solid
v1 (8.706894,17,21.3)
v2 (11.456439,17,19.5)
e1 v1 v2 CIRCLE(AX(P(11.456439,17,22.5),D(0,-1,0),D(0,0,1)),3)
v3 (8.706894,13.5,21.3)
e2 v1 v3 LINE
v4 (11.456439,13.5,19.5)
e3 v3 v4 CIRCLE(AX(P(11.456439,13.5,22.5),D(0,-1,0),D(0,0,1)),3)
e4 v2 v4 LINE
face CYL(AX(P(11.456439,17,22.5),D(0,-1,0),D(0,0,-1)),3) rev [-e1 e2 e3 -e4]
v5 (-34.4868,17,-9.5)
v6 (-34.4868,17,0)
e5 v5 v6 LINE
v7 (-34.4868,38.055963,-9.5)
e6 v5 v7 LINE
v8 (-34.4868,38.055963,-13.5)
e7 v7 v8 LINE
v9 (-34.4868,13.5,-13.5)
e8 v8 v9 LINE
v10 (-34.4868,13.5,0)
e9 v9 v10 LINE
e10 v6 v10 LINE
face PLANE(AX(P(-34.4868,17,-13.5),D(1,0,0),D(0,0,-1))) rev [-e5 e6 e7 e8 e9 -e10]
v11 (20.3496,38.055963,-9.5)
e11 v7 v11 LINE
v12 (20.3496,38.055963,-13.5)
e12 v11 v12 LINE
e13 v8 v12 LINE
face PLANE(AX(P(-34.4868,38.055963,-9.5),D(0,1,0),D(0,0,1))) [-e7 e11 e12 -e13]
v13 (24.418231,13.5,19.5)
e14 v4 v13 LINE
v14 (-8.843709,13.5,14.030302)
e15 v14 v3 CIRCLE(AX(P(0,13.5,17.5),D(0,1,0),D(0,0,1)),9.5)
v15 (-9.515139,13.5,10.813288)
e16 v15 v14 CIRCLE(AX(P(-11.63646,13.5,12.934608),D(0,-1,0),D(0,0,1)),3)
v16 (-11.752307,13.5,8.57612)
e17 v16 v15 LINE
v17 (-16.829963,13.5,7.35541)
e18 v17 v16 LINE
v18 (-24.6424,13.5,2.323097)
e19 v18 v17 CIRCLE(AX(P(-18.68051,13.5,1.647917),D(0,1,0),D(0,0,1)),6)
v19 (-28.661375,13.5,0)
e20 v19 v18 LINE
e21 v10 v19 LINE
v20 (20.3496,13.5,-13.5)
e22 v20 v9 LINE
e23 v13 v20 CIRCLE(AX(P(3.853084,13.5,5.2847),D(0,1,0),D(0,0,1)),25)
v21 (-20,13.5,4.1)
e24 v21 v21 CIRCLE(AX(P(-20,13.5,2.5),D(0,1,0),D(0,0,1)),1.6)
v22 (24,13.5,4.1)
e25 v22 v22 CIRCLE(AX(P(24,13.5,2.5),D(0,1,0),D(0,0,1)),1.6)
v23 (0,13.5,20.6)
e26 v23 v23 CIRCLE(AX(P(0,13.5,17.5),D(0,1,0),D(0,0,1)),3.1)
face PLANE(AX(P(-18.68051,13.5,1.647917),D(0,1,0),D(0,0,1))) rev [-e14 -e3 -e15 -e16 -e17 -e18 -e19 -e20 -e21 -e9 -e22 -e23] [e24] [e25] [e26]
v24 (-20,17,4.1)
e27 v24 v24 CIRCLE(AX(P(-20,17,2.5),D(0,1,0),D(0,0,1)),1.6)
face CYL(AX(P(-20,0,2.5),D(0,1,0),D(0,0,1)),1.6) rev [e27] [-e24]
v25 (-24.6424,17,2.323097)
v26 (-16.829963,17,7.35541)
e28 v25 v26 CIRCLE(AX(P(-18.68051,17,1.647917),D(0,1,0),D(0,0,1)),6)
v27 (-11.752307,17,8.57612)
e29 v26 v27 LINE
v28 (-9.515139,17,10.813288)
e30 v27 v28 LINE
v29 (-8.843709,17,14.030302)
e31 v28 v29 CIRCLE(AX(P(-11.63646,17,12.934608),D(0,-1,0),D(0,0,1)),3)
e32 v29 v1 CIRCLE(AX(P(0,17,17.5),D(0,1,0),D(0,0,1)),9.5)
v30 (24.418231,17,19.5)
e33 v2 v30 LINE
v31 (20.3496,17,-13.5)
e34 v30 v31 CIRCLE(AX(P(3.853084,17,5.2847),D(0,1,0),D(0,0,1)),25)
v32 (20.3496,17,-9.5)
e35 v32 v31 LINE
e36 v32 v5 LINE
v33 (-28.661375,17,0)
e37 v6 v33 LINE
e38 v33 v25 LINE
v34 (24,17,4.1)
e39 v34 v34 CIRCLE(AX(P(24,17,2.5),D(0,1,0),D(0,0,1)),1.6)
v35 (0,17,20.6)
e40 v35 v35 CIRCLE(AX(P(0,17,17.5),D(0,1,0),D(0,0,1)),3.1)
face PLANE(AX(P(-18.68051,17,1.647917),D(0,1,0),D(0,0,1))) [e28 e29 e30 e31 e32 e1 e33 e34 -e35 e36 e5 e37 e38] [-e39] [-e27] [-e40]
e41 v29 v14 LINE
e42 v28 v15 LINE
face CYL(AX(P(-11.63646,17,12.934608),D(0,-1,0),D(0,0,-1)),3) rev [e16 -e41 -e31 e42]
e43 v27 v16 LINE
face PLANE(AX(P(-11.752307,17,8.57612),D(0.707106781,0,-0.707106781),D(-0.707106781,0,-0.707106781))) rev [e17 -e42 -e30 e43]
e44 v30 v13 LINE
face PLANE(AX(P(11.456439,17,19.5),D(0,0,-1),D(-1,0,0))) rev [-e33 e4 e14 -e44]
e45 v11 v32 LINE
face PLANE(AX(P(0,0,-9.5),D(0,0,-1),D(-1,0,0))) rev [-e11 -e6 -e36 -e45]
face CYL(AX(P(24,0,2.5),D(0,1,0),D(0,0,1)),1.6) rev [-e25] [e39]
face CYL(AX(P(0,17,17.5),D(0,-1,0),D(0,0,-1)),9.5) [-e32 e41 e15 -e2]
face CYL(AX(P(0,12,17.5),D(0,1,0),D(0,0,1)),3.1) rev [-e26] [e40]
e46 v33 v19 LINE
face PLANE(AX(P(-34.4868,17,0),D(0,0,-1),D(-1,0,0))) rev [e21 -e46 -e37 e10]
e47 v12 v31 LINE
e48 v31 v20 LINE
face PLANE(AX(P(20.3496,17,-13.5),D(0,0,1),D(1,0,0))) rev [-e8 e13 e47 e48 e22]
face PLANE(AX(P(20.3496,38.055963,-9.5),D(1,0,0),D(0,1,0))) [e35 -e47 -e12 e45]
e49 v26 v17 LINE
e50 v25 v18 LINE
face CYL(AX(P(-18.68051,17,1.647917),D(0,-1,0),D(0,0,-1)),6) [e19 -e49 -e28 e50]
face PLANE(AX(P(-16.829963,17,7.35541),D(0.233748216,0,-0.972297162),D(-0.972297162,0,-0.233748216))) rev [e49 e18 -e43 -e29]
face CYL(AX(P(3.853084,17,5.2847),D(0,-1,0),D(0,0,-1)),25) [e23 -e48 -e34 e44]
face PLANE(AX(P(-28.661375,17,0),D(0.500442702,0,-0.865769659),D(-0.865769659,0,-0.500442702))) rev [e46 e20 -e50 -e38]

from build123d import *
from build123d.topology import SkipClean

# Parameters (mm, degrees)
CROQUIS1_W              = 70
CROQUIS1_H              = 65
EXTRUIR1_DEPTH          = 3.5
CROQUIS2_R              = 3.1
EXTRUIR2_DEPTH          = 5
EXTRUIR3_DEPTH          = 10
CROQUIS4_OUTSIDE_W      = 91.294
CROQUIS4_OUTSIDE_H      = 86.294
EXTRUIR4_DEPTH          = 10
REDONDEO1_R             = 3
EXTRUIR5_DEPTH          = 13.5
EXTRUIR6_DEPTH          = 3.5
CROQUIS7_R              = 1.6
EXTRUIR7_DEPTH          = 47.982330447
CROQUIS8_R              = 3.1
EXTRUIR8_DEPTH          = 5
CROQUIS9_W              = 0.7
CROQUIS9_H              = 10.5
EXTRUIR9_DEPTH          = 10
EXTRUIR10_DEPTH         = 63.752948337
EXTRUIR10_DEPTH_BACK    = 10
CROQUIS10_W             = 3.0625
CROQUIS10_H             = 5
CROQUIS11_W             = 54.8364
CROQUIS11_H             = 21.05596306
SALIENTE_EXTRUIR1_DEPTH = 4


with BuildPart() as part:
    # Croquis1 → Extruir1 (new body)
    with BuildSketch(Plane(origin=(0, 0, 0), x_dir=(1, 0, 0), z_dir=(0, 1, 0))):
        Rectangle(CROQUIS1_W, CROQUIS1_H)
    extrude(amount=EXTRUIR1_DEPTH)

    # Croquis2 → Extruir2 (cut)
    with BuildSketch(Plane(origin=(0, 3.5, 0), x_dir=(1, 0, 0), z_dir=(0, 1, 0))):
        with Locations(Location((0, -17.5, 0), (0, 0, 270))):
            Circle(CROQUIS2_R)
    extrude(amount=-EXTRUIR2_DEPTH, mode=Mode.SUBTRACT)

    # Croquis3 → Extruir3 (add)
    with BuildSketch(Plane(origin=(0, 3.5, 0), x_dir=(1, 0, 0), z_dir=(0, 1, 0))):
        with BuildLine():
            Line((-34.4868, 13.5), (20.3496, 13.5))
            Line((20.3496, 13.5), (20.3496, 0))
            Line((20.3496, 0), (17.146428199, 0))
            ThreePointArc((17.146428199, 0), (22.955777517, -8.939493087), (24.418230894, -19.5))
            Line((24.418230894, -19.5), (9.287087811, -19.5))
            ThreePointArc((9.287087811, -19.5), (-3.635492607, -26.276855559), (-7.981176331, -12.347250794))
            Line((-7.981176331, -12.347250794), (-18.680510212, -1.647916913))
            ThreePointArc((-18.680510212, -1.647916913), (-17.932408832, -0.806327142), (-17.146428199, 0))
            Line((-17.146428199, 0), (-34.4868, 0))
            Line((-34.4868, 0), (-34.4868, 13.5))
        make_face()
        with BuildLine():
            Line((-32.9868, 1.5), (-12.961481397, 1.5))
            ThreePointArc((-12.961481397, 1.5), (-14.868021343, 0.048274597), (-16.613165932, -1.593940849))
            Line((-16.613165932, -1.593940849), (-5.999348286, -12.207758495))
            ThreePointArc((-5.999348286, -12.207758495), (-3.061467459, -24.89103626), (7.984359711, -18))
            Line((7.984359711, -18), (22.994564575, -18))
            ThreePointArc((22.994564575, -18), (20.451694563, -6.977253708), (12.961481397, 1.5))
            Line((12.961481397, 1.5), (18.8496, 1.5))
            Line((18.8496, 1.5), (18.8496, 12))
            Line((18.8496, 12), (-32.9868, 12))
            Line((-32.9868, 12), (-32.9868, 1.5))
        make_face(mode=Mode.SUBTRACT)
    extrude(amount=EXTRUIR3_DEPTH)

    # Croquis4 outside → Extruir4 (cut)
    with SkipClean():  # the faces are left unmerged after this step: merging them gives an invalid solid
        with BuildSketch(Plane(origin=(0, 3.5, 0), x_dir=(1, 0, 0), z_dir=(0, 1, 0))):
            Rectangle(CROQUIS4_OUTSIDE_W, CROQUIS4_OUTSIDE_H)
            with BuildLine():
                Line((-34.4868, 0), (-17.146428199, 0))
                ThreePointArc((-17.146428199, 0), (-17.932408832, -0.806327142), (-18.680510212, -1.647916913))
                Line((-18.680510212, -1.647916913), (-7.981176331, -12.347250794))
                ThreePointArc((-7.981176331, -12.347250794), (-3.635492607, -26.276855559), (9.287087811, -19.5))
                Line((9.287087811, -19.5), (24.418230894, -19.5))
                ThreePointArc((24.418230894, -19.5), (22.955777517, -8.939493087), (17.146428199, 0))
                Line((17.146428199, 0), (20.3496, 0))
                Line((20.3496, 0), (20.3496, 13.5))
                Line((20.3496, 13.5), (-34.4868, 13.5))
                Line((-34.4868, 13.5), (-34.4868, 0))
            make_face(mode=Mode.SUBTRACT)
        extrude(amount=-EXTRUIR4_DEPTH, mode=Mode.SUBTRACT)

    # Redondeo1
    redondeo1_edges = [part.edges().sort_by_distance(p)[0] for p in [
        (-7.981176331, 8.5, 12.347250794),
        (9.287087811, 8.5, 19.5),
        (-5.999348286, 8.5, 12.207758495),
        (7.984359711, 8.5, 18),
    ]]
    fillet(redondeo1_edges, radius=REDONDEO1_R)

    # Croquis5 → Extruir5 (add)
    with SkipClean():  # the faces are left unmerged after this step: merging them gives an invalid solid
        with BuildSketch(Plane.XZ):
            with BuildLine():
                Line((-18.680510212, 1.647916913), (-14.437869525, 5.8905576))
                ThreePointArc((-14.437869525, 5.8905576), (-21.723092903, 6.819250451), (-24.449770984, 0))
                Line((-24.449770984, 0), (-17.146428199, 0))
                ThreePointArc((-17.146428199, 0), (-17.932408832, 0.806327142), (-18.680510212, 1.647916913))
            make_face()
            with BuildLine():
                Line((20.3496, 0), (20.3496, -13.5))
                ThreePointArc((20.3496, -13.5), (28.665212431, 2.225567304), (24.418230894, 19.5))
                ThreePointArc((24.418230894, 19.5), (22.955777517, 8.939493087), (17.146428199, 0))
                Line((17.146428199, 0), (20.3496, 0))
            make_face()
        extrude(amount=-EXTRUIR5_DEPTH)

    # Chaflán1
    # the kernel refuses this chamfer: 5, 4.044665138 mm, written as the material it adds along each edge
    with BuildSketch(Plane(origin=(-14.437869525, 3.5, 5.8905576), x_dir=(-0.8528028654224412, 0, 0.5222329678670944), z_dir=(0, 1, 0))) as chafl_n1_piece_1:
        with BuildLine():
            Line((2.946399951, -0.141421356), (-1.029187491, 3.834166086))
            Line((-1.029187491, 3.834166086), (-1.126417207, 3.810791264))
            ThreePointArc((-1.126417207, 3.810791264), (-0.561046898, 1.905915324), (-0.097229716, -0.023374822))
            Line((-0.097229716, -0.023374822), (0.023374822, -0.097229716))
            ThreePointArc((0.023374822, -0.097229716), (1.474874577, 0.065772974), (2.923025129, -0.238651072))
            Line((2.923025129, -0.238651072), (2.946399951, -0.141421356))
        make_face()
    extrude(amount=10)
    with BuildSketch(Plane(origin=(-24.449770984, 3.5, 0), x_dir=(-0.08263556343231732, 0, 0.9965798330571533), z_dir=(0, 1, 0))) as chafl_n1_piece_2:
        with BuildLine():
            Line((2.416506842, 0.180832589), (0.262590721, -4.378032196))
            Line((0.262590721, -4.378032196), (0.162932738, -4.386295752))
            ThreePointArc((0.162932738, -4.386295752), (0.081510488, -2.193144218), (-0.099657983, -0.008263556))
            Line((-0.099657983, -0.008263556), (0.019425577, 0.098095091))
            ThreePointArc((0.019425577, 0.098095091), (1.209024094, -0.014134236), (2.397081265, 0.278927681))
            Line((2.397081265, 0.278927681), (2.416506842, 0.180832589))
        make_face()
    extrude(amount=10)
    with BuildSketch(Plane(origin=(-24.449770984, 0, 0), x_dir=(-1, 0, 0), z_dir=(0, 1, 0))) as chafl_n1_piece_3:
        with BuildLine():
            Line((4.384757927, -0.10008854), (0.019475293, 2.423185189))
            Line((0.019475293, 2.423185189), (-0.079889541, 2.411932193))
            ThreePointArc((-0.079889541, 2.411932193), (0.113994282, 1.203721039), (-0.096154346, 0.027465282))
            Line((-0.096154346, 0.027465282), (0, -0.1))
            ThreePointArc((0, -0.1), (2.192378963, -0.1), (4.384757927, -0.20008854))
            Line((4.384757927, -0.20008854), (4.384757927, -0.10008854))
        make_face()
    extrude(amount=3.5)
    with BuildSketch(Plane(origin=(-14.437869525, 0, 5.8905576), x_dir=(0.7071067811865478, 0, 0.7071067811865472), z_dir=(0, 1, 0))) as chafl_n1_piece_4:
        with BuildLine():
            Line((3.968519544, 0.104446594), (-0.826219316, -2.831719321))
            Line((-0.826219316, -2.831719321), (-0.91529167, -2.786264775))
            ThreePointArc((-0.91529167, -2.786264775), (-0.280798425, -1.449390681), (-0.1, 0))
            Line((-0.1, 0), (0, 0.1))
            ThreePointArc((0, 0.1), (1.984259772, 0.1), (3.968519544, 0.204446594))
            Line((3.968519544, 0.204446594), (3.968519544, 0.104446594))
        make_face()
    extrude(amount=3.5)


with BuildPart() as body_2:
    # Croquis6 → Extruir6 (new body)
    with BuildSketch(Plane(origin=(0, 13.5, 0), x_dir=(1, 0, 0), z_dir=(0, 1, 0))):
        with BuildLine():
            Line((-34.4868, 13.5), (-34.4868, 0))
            Line((-34.4868, 0), (-28.661374979, 0))
            Line((-28.661374979, 0), (-24.642400208, -2.323096648))
            ThreePointArc((-24.642400208, -2.323096648), (-21.929637735, -6.692039268), (-16.829963308, -7.355409896))
            Line((-16.829963308, -7.355409896), (-11.752306982, -8.576120143))
            Line((-11.752306982, -8.576120143), (-9.515139435, -10.813287689))
            ThreePointArc((-9.515139435, -10.813287689), (-8.69974084, -12.321679102), (-8.843709432, -14.030302105))
            ThreePointArc((-8.843709432, -14.030302105), (-3.635492607, -26.276855559), (8.70689382, -21.3))
            ThreePointArc((8.70689382, -21.3), (9.813271565, -19.99001992), (11.456439237, -19.5))
            Line((11.456439237, -19.5), (24.418230894, -19.5))
            ThreePointArc((24.418230894, -19.5), (28.665212431, -2.225567304), (20.3496, 13.5))
            Line((20.3496, 13.5), (-34.4868, 13.5))
        make_face()
    extrude(amount=EXTRUIR6_DEPTH)


with BuildPart() as extruir7_tool:
    # Croquis7 → Extruir7 (new, through all)
    with BuildSketch(Plane(origin=(0, 17, 0), x_dir=(1, 0, 0), z_dir=(0, 1, 0))):
        with Locations(Location((-20, -2.5, 0), (0, 0, 270))):
            Circle(CROQUIS7_R)
        with Locations(Location((24, -2.5, 0), (0, 0, 270))):
            Circle(CROQUIS7_R)
    extrude(amount=-EXTRUIR7_DEPTH)


with BuildPart() as part_1:
    add(part.part)

    # Extruir7: cut by extruir7_tool
    add(extruir7_tool.part, mode=Mode.SUBTRACT)

    # Croquis9 → Extruir9 (cut)
    with BuildSketch(Plane(origin=(0, 13.5, 0), x_dir=(1, 0, 0), z_dir=(0, 1, 0))):
        with Locations((19.1996, 6.75)):
            Rectangle(CROQUIS9_W, CROQUIS9_H)
    extrude(amount=-EXTRUIR9_DEPTH, mode=Mode.SUBTRACT)

    # Croquis10 → Extruir10 (cut, two sides: drawn at the far end of the back side and taken through both)
    with BuildSketch(Plane.ZY.offset(-19.5496).offset(-EXTRUIR10_DEPTH_BACK)):
        with Locations((-8.9375, 8.5)):
            Rectangle(CROQUIS10_W, CROQUIS10_H)
    extrude(amount=EXTRUIR10_DEPTH + EXTRUIR10_DEPTH_BACK, mode=Mode.SUBTRACT)


with BuildPart() as body_2_1:
    add(body_2.part)

    # Extruir7: cut by extruir7_tool
    add(extruir7_tool.part, mode=Mode.SUBTRACT)

    # Croquis8 → Extruir8 (cut)
    with BuildSketch(Plane(origin=(0, 17, 0), x_dir=(1, 0, 0), z_dir=(0, 1, 0))):
        with Locations(Location((0, -17.5, 0), (0, 0, 270))):
            Circle(CROQUIS8_R)
    extrude(amount=-EXTRUIR8_DEPTH, mode=Mode.SUBTRACT)

    # Croquis11 → Saliente-Extruir1 (add)
    with BuildSketch(Plane(origin=(0, 0, -13.5), x_dir=(-1, 0, 0), z_dir=(0, 0, -1))):
        with Locations((7.0686, 27.52798153)):
            Rectangle(CROQUIS11_W, CROQUIS11_H)
    extrude(amount=-SALIENTE_EXTRUIR1_DEPTH)


solid = body_2_1.part
